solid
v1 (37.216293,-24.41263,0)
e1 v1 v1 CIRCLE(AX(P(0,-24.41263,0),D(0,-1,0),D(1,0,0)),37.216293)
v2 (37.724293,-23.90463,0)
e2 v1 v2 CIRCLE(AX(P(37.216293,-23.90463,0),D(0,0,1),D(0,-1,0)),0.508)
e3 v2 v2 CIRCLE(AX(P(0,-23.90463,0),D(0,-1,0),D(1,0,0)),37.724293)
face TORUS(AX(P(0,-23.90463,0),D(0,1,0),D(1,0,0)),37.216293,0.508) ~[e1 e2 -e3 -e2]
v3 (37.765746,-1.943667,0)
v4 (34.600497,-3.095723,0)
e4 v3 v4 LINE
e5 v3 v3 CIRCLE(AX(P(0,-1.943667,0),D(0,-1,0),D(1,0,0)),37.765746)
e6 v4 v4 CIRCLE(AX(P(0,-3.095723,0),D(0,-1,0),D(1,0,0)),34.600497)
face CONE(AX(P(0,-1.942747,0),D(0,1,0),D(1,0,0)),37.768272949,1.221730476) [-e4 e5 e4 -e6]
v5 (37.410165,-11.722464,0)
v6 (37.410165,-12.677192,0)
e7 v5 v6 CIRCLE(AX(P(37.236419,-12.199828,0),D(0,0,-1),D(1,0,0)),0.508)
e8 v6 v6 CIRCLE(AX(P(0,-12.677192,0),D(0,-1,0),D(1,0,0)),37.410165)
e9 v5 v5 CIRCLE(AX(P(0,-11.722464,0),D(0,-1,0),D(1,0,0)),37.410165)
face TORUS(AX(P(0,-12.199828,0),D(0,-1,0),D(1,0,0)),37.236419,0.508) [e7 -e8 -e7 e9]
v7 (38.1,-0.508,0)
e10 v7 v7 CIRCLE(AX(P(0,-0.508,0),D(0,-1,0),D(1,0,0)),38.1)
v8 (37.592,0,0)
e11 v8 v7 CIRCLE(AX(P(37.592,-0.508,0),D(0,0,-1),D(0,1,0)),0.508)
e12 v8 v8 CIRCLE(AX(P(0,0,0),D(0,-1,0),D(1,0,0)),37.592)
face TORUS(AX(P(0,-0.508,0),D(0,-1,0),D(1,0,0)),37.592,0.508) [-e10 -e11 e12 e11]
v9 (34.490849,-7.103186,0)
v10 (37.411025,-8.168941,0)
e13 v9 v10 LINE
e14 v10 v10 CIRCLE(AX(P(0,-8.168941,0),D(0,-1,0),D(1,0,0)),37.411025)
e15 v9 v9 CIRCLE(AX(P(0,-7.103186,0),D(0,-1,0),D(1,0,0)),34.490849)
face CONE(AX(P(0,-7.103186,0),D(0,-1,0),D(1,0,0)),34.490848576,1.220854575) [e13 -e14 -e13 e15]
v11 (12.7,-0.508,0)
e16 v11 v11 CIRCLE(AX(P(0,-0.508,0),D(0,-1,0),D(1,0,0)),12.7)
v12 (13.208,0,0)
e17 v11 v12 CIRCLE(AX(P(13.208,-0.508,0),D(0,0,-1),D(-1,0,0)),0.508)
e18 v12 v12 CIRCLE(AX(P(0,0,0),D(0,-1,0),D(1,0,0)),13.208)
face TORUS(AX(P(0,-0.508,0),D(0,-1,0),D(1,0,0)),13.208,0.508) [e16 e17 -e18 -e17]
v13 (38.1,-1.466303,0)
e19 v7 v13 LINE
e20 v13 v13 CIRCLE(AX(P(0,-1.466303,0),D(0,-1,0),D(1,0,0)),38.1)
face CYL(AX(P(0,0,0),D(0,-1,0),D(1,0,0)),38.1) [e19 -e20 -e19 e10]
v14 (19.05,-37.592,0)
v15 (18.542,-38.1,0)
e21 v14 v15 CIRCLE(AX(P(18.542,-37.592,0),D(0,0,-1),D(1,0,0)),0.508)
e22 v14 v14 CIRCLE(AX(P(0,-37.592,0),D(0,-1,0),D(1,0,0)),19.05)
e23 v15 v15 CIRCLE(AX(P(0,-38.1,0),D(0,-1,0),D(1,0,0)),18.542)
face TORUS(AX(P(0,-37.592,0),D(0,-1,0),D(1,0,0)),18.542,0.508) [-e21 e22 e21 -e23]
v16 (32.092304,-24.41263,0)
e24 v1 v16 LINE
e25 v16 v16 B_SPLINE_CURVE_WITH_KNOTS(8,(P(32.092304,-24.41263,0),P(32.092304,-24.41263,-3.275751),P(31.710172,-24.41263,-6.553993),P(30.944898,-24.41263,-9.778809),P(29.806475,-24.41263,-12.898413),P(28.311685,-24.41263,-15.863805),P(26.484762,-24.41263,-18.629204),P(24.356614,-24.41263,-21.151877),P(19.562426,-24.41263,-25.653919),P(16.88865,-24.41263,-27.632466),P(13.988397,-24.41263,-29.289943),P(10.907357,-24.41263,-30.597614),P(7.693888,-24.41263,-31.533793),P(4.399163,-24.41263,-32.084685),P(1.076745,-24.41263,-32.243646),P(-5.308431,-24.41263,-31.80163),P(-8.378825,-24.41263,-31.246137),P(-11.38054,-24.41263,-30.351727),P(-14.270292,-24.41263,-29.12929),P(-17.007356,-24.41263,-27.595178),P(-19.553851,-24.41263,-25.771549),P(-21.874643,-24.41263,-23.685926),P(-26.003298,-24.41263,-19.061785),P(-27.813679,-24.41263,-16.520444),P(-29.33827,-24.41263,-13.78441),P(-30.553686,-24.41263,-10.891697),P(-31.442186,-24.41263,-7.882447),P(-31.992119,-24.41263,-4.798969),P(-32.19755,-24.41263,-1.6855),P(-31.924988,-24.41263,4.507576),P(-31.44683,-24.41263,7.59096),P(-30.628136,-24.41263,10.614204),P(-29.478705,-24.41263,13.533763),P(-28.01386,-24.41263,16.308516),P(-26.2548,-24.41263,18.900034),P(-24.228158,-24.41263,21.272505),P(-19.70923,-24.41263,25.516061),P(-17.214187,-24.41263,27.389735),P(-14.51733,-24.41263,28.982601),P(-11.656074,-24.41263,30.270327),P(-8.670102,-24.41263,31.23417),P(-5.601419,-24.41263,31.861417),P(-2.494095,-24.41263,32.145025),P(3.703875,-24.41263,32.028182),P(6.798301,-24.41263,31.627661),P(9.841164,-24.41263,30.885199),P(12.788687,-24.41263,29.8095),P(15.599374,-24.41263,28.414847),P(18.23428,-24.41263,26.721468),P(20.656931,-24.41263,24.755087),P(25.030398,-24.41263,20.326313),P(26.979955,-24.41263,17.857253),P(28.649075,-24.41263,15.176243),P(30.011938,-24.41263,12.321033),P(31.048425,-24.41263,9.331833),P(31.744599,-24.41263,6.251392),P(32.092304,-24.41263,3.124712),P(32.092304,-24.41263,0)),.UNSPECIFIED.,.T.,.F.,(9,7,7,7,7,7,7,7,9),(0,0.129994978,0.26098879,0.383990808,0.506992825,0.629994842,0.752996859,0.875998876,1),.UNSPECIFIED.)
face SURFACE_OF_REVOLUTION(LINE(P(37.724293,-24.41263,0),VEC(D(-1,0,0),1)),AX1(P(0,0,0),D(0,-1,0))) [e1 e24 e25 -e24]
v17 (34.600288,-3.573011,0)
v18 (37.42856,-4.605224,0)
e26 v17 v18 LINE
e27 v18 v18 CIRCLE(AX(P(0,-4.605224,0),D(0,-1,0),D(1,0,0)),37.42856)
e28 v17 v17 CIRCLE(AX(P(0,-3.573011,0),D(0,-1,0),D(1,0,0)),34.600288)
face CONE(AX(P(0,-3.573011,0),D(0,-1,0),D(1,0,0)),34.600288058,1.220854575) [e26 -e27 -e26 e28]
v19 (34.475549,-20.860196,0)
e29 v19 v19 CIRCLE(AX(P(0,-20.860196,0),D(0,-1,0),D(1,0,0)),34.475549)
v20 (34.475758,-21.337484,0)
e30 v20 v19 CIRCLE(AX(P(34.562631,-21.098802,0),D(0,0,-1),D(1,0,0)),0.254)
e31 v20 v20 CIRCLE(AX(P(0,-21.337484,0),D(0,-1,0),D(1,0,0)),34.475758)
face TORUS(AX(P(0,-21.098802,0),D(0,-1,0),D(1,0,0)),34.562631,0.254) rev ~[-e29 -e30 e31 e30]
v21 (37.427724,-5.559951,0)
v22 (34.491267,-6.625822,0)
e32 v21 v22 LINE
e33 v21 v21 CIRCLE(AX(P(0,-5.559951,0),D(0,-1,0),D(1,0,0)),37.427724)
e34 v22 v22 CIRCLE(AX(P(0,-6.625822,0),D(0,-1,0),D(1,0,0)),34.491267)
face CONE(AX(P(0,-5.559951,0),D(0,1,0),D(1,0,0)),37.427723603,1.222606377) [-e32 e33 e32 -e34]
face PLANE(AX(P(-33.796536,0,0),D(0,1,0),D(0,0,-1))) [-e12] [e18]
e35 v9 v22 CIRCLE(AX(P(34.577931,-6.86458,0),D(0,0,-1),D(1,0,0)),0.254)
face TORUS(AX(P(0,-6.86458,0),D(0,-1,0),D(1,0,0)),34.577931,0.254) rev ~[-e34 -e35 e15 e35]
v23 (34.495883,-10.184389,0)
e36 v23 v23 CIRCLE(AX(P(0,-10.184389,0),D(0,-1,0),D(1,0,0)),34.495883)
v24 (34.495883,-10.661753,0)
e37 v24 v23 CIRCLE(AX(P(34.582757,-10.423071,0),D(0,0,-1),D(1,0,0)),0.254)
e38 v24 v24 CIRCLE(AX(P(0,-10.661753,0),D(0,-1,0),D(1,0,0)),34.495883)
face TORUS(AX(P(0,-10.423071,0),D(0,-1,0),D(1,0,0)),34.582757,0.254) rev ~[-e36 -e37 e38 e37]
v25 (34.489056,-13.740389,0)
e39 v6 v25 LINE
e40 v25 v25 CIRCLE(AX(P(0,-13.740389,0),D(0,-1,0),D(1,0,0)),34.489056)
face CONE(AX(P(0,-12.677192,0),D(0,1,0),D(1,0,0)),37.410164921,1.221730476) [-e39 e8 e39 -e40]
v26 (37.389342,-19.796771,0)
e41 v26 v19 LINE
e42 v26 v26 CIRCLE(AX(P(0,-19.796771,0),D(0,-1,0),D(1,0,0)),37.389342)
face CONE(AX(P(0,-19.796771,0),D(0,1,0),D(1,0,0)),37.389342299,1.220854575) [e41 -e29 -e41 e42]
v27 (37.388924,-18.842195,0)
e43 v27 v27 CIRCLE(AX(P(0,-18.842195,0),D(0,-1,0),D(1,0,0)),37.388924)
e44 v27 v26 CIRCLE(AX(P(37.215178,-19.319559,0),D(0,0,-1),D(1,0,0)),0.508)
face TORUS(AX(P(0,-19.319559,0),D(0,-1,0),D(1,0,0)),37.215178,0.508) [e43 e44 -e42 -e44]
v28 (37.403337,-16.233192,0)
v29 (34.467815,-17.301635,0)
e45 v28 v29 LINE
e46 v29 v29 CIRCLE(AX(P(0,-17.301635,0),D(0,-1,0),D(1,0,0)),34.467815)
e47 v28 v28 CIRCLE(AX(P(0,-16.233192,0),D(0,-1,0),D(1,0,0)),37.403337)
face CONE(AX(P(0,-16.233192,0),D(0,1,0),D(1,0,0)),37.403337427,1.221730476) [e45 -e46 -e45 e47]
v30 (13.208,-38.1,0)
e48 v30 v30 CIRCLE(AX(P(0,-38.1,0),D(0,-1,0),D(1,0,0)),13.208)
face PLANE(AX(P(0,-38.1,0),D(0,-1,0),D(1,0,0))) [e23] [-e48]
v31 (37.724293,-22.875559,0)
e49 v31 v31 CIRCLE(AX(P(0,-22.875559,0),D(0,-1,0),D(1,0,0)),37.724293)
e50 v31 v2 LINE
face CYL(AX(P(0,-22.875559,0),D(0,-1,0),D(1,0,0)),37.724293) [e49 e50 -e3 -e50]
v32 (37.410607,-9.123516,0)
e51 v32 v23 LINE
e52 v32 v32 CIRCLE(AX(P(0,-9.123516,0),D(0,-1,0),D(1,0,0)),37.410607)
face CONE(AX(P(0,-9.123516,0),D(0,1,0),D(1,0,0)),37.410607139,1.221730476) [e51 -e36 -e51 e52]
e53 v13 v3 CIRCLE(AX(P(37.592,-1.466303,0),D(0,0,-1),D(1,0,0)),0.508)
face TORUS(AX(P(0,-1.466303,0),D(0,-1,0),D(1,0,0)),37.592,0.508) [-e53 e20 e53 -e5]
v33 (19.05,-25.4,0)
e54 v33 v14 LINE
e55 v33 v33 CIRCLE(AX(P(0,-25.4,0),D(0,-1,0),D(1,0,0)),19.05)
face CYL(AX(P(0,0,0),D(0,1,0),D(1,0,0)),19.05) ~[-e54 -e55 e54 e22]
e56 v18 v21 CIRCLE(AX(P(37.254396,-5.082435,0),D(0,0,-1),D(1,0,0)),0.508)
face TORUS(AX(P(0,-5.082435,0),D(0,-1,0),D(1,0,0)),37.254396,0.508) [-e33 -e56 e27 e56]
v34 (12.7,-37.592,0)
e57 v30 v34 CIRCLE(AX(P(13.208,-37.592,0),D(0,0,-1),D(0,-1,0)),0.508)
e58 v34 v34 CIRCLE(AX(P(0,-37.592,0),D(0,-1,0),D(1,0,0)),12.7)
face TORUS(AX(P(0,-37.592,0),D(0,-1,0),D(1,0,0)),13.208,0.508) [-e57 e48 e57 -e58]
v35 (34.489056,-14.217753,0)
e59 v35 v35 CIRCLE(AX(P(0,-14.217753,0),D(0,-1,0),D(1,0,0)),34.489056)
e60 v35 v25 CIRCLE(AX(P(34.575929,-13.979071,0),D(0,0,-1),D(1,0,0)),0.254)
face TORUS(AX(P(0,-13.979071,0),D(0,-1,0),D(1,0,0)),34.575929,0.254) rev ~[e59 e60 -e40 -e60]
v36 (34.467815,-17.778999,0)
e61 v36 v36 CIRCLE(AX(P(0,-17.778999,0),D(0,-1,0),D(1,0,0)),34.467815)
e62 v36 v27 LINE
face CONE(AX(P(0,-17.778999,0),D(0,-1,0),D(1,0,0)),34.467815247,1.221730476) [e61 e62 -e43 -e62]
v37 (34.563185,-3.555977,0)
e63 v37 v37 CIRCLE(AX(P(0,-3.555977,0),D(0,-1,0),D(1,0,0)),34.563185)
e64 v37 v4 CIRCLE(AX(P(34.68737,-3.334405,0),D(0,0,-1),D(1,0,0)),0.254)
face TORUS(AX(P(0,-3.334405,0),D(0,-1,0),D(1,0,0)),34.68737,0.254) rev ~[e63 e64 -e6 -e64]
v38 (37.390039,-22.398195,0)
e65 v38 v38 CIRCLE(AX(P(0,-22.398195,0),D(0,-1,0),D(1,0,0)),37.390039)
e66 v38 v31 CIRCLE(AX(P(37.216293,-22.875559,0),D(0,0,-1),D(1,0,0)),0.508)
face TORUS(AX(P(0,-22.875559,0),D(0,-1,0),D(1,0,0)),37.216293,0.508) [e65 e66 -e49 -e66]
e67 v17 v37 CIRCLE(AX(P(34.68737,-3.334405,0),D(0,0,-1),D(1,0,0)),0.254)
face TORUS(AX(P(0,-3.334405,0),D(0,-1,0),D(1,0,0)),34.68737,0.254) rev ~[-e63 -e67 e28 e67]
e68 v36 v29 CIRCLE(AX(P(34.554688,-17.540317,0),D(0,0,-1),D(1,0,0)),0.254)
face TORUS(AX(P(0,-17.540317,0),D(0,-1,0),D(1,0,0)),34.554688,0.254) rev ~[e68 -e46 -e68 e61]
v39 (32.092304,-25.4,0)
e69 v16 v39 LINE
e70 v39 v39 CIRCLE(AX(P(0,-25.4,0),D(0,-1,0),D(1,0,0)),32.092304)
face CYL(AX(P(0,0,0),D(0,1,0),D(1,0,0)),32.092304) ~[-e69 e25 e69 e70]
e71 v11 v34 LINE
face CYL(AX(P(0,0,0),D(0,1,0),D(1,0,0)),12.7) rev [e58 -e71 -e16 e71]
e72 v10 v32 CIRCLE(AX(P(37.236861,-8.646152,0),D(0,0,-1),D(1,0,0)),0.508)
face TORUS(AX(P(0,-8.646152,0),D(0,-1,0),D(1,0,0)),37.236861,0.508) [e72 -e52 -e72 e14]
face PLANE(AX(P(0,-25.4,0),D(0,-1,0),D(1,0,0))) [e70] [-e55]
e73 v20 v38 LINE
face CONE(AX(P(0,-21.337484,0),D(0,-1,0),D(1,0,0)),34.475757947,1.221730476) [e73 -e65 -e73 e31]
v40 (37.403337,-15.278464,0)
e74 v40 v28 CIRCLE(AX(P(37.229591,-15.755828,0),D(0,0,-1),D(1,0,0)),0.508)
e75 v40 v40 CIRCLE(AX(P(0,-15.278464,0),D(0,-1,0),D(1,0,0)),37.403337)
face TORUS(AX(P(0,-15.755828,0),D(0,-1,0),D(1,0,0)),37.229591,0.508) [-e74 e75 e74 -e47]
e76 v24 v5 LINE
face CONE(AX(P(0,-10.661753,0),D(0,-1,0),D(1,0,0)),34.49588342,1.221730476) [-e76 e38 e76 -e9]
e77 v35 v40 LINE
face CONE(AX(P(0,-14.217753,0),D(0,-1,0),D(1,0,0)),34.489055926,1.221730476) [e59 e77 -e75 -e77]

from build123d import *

# Parameters (mm, degrees)
F0_R     = 19.05
F0_R_2   = 12.7
F3_DEPTH = 38.1
F0_R_3   = 32.0923043069
F4_DEPTH = 25.4


# Not quite as in the source:
# - a fillet or chamfer that OpenCascade refuses, or shapes differently, is made with other operations: its cross-section is extruded or revolved along the edge and cut away or added


with BuildPart() as f2:
    # F2: sweep along a path in F0
    with BuildLine(Plane.XZ) as f2_path:
        CenterArc((0, 0), 38.1, 0, 360)
    # F1 (on Right) → F2 (sweep)
    with BuildSketch(Plane.YZ):
        with BuildLine():
            Line((-24.4126301259, 29.4930711389), (0, 29.4930711389))
            Line((0, 29.4930711389), (0, 38.1))
            Line((0, 38.1), (-1.5159870583, 38.1))
            ThreePointArc((-1.5159870583, 38.1), (-1.7771493825, 37.9956074959), (-1.942746962, 37.7682729492))
            Line((-1.942746962, 37.7682729492), (-3.0957230848, 34.6004970869))
            ThreePointArc((-3.0957230848, 34.6004970869), (-3.313880751, 34.4342007842), (-3.5559765663, 34.563184674))
            ThreePointArc((-3.5559765663, 34.563184674), (-3.5652403449, 34.5813935625), (-3.5730107524, 34.6002880585))
            Line((-3.5730107524, 34.6002880585), (-4.6052238569, 37.4285598497))
            ThreePointArc((-4.6052238569, 37.4285598497), (-5.0828802983, 37.7623953652), (-5.5599511934, 37.4277236028))
            Line((-5.5599511934, 37.4277236028), (-6.6258222527, 34.4912666992))
            ThreePointArc((-6.6258222527, 34.4912666992), (-6.8643577003, 34.323930818), (-7.103185921, 34.4908485758))
            Line((-7.103185921, 34.4908485758), (-8.1689408402, 37.4110251954))
            ThreePointArc((-8.1689408402, 37.4110251954), (-8.6463748028, 37.7448608571), (-9.1235161753, 37.4106071386))
            Line((-9.1235161753, 37.4106071386), (-10.1843888499, 34.4958834202))
            ThreePointArc((-10.1843888499, 34.4958834202), (-10.4230707756, 34.3287565366), (-10.6617527013, 34.4958834202))
            Line((-10.6617527013, 34.4958834202), (-11.722464422, 37.4101649213))
            ThreePointArc((-11.722464422, 37.4101649213), (-12.1998282733, 37.7444186885), (-12.6771921247, 37.4101649213))
            Line((-12.6771921247, 37.4101649213), (-13.7403888499, 34.4890559262))
            ThreePointArc((-13.7403888499, 34.4890559262), (-13.9790707756, 34.3219290426), (-14.2177527013, 34.4890559262))
            Line((-14.2177527013, 34.4890559262), (-15.278464422, 37.4033374273))
            ThreePointArc((-15.278464422, 37.4033374273), (-15.7558282733, 37.7375911945), (-16.2331921247, 37.4033374273))
            Line((-16.2331921247, 37.4033374273), (-17.3016348202, 34.4678152474))
            ThreePointArc((-17.3016348202, 34.4678152474), (-17.5403167459, 34.3006883638), (-17.7789986716, 34.4678152474))
            Line((-17.7789986716, 34.4678152474), (-18.8421953968, 37.3889242425))
            ThreePointArc((-18.8421953968, 37.3889242425), (-19.3193367693, 37.723177961), (-19.7967707319, 37.3893422992))
            Line((-19.7967707319, 37.3893422992), (-20.8601960086, 34.4755489182))
            ThreePointArc((-20.8601960086, 34.4755489182), (-21.0989129899, 34.3086310873), (-21.3374836761, 34.4757579466))
            Line((-21.3374836761, 34.4757579466), (-22.3981953968, 37.3900394477))
            ThreePointArc((-22.3981953968, 37.3900394477), (-22.5841824185, 37.6324224534), (-22.8755592482, 37.7242932149))
            Line((-22.8755592482, 37.7242932149), (-24.4126301259, 37.7242932149))
            Line((-24.4126301259, 37.7242932149), (-24.4126301259, 34.4785183216))
            Line((-24.4126301259, 34.4785183216), (-24.4126301259, 29.4930711389))
        make_face()
    sweep(path=f2_path.line)



with BuildPart() as f3:
    # F0 (on Front) → F3 (new body)
    with BuildSketch(Plane.XZ):
        Circle(F0_R)
        Circle(F0_R_2, mode=Mode.SUBTRACT)
    extrude(amount=F3_DEPTH)


with BuildPart() as f2_1:
    add(f2.part)

    add(f3.part)  # F4 merges F3
    # F0 (on Front) → F4 (join)
    with BuildSketch(Plane.XZ):
        Circle(F0_R_3)
        Circle(F0_R, mode=Mode.SUBTRACT)
    extrude(amount=F4_DEPTH)

    # F5: fillet of radius 0.508 on 9 edges, made by hand

    # F5_s1 → F5_t2 (revolve, cut)
    with BuildSketch(Plane.XY):
        with BuildLine():
            ThreePointArc((37.592, 0), (37.9512102448, -0.1487897552), (38.1, -0.508))
            Line((38.1, -0.508), (38.1, 0))
            Line((38.1, 0), (37.592, 0))
        make_face()
    revolve(axis=Axis((0, 0, 0), (0, -1, 0)), mode=Mode.SUBTRACT)

    # F5_s3 → F5_t4 (revolve, cut)
    with BuildSketch(Plane.XY):
        with BuildLine():
            ThreePointArc((38.1, -1.4663027602), (38.0081292385, -1.7576795899), (37.7657462328, -1.9436666116))
            Line((37.7657462328, -1.9436666116), (37.7831208561, -1.9914029967))
            ThreePointArc((37.7831208561, -1.9914029967), (37.7856475724, -1.9904833471), (38.1505473284, -1.521047453))
            Line((38.1505473284, -1.521047453), (38.1508, -1.5159870583))
            Line((38.1508, -1.5159870583), (38.1508, -1.4663027602))
            Line((38.1508, -1.4663027602), (38.1, -1.4663027602))
        make_face()
    revolve(axis=Axis((0, -1.5159870583, 0), (0, -1, 0)), mode=Mode.SUBTRACT)

    # F5_s5 → F5_t6 (revolve, cut)
    with BuildSketch(Plane.XY):
        with BuildLine():
            ThreePointArc((37.2162932149, -24.4126301259), (37.5755034597, -24.2638403707), (37.7242932149, -23.9046301259))
            Line((37.7242932149, -23.9046301259), (37.7242932149, -24.4126301259))
            Line((37.7242932149, -24.4126301259), (37.2162932149, -24.4126301259))
        make_face()
    revolve(axis=Axis((0, -24.4126301259, 0), (0, -1, 0)), mode=Mode.SUBTRACT)

    # F5_s7 → F5_t8 (revolve, cut)
    with BuildSketch(Plane.XY):
        with BuildLine():
            ThreePointArc((19.05, -37.592), (18.9012102448, -37.9512102448), (18.542, -38.1))
            Line((18.542, -38.1), (19.05, -38.1))
            Line((19.05, -38.1), (19.05, -37.592))
        make_face()
    revolve(axis=Axis((0, -38.1, 0), (0, -1, 0)), mode=Mode.SUBTRACT)

    # F5_s9 → F5_t10 (revolve, cut)
    with BuildSketch(Plane.XY):
        with BuildLine():
            ThreePointArc((13.208, -38.1), (12.8487897552, -37.9512102448), (12.7, -37.592))
            Line((12.7, -37.592), (12.7, -38.1))
            Line((12.7, -38.1), (13.208, -38.1))
        make_face()
    revolve(axis=Axis((0, -38.1, 0), (0, -1, 0)), mode=Mode.SUBTRACT)

    # F5_s11 → F5_t12 (revolve, cut)
    with BuildSketch(Plane.XY):
        with BuildLine():
            ThreePointArc((12.7, -0.508), (12.8487897552, -0.1487897552), (13.208, 0))
            Line((13.208, 0), (12.7, 0))
            Line((12.7, 0), (12.7, -0.508))
        make_face()
    revolve(axis=Axis((0, 0, 0), (0, -1, 0)), mode=Mode.SUBTRACT)


solid = f2_1.part
